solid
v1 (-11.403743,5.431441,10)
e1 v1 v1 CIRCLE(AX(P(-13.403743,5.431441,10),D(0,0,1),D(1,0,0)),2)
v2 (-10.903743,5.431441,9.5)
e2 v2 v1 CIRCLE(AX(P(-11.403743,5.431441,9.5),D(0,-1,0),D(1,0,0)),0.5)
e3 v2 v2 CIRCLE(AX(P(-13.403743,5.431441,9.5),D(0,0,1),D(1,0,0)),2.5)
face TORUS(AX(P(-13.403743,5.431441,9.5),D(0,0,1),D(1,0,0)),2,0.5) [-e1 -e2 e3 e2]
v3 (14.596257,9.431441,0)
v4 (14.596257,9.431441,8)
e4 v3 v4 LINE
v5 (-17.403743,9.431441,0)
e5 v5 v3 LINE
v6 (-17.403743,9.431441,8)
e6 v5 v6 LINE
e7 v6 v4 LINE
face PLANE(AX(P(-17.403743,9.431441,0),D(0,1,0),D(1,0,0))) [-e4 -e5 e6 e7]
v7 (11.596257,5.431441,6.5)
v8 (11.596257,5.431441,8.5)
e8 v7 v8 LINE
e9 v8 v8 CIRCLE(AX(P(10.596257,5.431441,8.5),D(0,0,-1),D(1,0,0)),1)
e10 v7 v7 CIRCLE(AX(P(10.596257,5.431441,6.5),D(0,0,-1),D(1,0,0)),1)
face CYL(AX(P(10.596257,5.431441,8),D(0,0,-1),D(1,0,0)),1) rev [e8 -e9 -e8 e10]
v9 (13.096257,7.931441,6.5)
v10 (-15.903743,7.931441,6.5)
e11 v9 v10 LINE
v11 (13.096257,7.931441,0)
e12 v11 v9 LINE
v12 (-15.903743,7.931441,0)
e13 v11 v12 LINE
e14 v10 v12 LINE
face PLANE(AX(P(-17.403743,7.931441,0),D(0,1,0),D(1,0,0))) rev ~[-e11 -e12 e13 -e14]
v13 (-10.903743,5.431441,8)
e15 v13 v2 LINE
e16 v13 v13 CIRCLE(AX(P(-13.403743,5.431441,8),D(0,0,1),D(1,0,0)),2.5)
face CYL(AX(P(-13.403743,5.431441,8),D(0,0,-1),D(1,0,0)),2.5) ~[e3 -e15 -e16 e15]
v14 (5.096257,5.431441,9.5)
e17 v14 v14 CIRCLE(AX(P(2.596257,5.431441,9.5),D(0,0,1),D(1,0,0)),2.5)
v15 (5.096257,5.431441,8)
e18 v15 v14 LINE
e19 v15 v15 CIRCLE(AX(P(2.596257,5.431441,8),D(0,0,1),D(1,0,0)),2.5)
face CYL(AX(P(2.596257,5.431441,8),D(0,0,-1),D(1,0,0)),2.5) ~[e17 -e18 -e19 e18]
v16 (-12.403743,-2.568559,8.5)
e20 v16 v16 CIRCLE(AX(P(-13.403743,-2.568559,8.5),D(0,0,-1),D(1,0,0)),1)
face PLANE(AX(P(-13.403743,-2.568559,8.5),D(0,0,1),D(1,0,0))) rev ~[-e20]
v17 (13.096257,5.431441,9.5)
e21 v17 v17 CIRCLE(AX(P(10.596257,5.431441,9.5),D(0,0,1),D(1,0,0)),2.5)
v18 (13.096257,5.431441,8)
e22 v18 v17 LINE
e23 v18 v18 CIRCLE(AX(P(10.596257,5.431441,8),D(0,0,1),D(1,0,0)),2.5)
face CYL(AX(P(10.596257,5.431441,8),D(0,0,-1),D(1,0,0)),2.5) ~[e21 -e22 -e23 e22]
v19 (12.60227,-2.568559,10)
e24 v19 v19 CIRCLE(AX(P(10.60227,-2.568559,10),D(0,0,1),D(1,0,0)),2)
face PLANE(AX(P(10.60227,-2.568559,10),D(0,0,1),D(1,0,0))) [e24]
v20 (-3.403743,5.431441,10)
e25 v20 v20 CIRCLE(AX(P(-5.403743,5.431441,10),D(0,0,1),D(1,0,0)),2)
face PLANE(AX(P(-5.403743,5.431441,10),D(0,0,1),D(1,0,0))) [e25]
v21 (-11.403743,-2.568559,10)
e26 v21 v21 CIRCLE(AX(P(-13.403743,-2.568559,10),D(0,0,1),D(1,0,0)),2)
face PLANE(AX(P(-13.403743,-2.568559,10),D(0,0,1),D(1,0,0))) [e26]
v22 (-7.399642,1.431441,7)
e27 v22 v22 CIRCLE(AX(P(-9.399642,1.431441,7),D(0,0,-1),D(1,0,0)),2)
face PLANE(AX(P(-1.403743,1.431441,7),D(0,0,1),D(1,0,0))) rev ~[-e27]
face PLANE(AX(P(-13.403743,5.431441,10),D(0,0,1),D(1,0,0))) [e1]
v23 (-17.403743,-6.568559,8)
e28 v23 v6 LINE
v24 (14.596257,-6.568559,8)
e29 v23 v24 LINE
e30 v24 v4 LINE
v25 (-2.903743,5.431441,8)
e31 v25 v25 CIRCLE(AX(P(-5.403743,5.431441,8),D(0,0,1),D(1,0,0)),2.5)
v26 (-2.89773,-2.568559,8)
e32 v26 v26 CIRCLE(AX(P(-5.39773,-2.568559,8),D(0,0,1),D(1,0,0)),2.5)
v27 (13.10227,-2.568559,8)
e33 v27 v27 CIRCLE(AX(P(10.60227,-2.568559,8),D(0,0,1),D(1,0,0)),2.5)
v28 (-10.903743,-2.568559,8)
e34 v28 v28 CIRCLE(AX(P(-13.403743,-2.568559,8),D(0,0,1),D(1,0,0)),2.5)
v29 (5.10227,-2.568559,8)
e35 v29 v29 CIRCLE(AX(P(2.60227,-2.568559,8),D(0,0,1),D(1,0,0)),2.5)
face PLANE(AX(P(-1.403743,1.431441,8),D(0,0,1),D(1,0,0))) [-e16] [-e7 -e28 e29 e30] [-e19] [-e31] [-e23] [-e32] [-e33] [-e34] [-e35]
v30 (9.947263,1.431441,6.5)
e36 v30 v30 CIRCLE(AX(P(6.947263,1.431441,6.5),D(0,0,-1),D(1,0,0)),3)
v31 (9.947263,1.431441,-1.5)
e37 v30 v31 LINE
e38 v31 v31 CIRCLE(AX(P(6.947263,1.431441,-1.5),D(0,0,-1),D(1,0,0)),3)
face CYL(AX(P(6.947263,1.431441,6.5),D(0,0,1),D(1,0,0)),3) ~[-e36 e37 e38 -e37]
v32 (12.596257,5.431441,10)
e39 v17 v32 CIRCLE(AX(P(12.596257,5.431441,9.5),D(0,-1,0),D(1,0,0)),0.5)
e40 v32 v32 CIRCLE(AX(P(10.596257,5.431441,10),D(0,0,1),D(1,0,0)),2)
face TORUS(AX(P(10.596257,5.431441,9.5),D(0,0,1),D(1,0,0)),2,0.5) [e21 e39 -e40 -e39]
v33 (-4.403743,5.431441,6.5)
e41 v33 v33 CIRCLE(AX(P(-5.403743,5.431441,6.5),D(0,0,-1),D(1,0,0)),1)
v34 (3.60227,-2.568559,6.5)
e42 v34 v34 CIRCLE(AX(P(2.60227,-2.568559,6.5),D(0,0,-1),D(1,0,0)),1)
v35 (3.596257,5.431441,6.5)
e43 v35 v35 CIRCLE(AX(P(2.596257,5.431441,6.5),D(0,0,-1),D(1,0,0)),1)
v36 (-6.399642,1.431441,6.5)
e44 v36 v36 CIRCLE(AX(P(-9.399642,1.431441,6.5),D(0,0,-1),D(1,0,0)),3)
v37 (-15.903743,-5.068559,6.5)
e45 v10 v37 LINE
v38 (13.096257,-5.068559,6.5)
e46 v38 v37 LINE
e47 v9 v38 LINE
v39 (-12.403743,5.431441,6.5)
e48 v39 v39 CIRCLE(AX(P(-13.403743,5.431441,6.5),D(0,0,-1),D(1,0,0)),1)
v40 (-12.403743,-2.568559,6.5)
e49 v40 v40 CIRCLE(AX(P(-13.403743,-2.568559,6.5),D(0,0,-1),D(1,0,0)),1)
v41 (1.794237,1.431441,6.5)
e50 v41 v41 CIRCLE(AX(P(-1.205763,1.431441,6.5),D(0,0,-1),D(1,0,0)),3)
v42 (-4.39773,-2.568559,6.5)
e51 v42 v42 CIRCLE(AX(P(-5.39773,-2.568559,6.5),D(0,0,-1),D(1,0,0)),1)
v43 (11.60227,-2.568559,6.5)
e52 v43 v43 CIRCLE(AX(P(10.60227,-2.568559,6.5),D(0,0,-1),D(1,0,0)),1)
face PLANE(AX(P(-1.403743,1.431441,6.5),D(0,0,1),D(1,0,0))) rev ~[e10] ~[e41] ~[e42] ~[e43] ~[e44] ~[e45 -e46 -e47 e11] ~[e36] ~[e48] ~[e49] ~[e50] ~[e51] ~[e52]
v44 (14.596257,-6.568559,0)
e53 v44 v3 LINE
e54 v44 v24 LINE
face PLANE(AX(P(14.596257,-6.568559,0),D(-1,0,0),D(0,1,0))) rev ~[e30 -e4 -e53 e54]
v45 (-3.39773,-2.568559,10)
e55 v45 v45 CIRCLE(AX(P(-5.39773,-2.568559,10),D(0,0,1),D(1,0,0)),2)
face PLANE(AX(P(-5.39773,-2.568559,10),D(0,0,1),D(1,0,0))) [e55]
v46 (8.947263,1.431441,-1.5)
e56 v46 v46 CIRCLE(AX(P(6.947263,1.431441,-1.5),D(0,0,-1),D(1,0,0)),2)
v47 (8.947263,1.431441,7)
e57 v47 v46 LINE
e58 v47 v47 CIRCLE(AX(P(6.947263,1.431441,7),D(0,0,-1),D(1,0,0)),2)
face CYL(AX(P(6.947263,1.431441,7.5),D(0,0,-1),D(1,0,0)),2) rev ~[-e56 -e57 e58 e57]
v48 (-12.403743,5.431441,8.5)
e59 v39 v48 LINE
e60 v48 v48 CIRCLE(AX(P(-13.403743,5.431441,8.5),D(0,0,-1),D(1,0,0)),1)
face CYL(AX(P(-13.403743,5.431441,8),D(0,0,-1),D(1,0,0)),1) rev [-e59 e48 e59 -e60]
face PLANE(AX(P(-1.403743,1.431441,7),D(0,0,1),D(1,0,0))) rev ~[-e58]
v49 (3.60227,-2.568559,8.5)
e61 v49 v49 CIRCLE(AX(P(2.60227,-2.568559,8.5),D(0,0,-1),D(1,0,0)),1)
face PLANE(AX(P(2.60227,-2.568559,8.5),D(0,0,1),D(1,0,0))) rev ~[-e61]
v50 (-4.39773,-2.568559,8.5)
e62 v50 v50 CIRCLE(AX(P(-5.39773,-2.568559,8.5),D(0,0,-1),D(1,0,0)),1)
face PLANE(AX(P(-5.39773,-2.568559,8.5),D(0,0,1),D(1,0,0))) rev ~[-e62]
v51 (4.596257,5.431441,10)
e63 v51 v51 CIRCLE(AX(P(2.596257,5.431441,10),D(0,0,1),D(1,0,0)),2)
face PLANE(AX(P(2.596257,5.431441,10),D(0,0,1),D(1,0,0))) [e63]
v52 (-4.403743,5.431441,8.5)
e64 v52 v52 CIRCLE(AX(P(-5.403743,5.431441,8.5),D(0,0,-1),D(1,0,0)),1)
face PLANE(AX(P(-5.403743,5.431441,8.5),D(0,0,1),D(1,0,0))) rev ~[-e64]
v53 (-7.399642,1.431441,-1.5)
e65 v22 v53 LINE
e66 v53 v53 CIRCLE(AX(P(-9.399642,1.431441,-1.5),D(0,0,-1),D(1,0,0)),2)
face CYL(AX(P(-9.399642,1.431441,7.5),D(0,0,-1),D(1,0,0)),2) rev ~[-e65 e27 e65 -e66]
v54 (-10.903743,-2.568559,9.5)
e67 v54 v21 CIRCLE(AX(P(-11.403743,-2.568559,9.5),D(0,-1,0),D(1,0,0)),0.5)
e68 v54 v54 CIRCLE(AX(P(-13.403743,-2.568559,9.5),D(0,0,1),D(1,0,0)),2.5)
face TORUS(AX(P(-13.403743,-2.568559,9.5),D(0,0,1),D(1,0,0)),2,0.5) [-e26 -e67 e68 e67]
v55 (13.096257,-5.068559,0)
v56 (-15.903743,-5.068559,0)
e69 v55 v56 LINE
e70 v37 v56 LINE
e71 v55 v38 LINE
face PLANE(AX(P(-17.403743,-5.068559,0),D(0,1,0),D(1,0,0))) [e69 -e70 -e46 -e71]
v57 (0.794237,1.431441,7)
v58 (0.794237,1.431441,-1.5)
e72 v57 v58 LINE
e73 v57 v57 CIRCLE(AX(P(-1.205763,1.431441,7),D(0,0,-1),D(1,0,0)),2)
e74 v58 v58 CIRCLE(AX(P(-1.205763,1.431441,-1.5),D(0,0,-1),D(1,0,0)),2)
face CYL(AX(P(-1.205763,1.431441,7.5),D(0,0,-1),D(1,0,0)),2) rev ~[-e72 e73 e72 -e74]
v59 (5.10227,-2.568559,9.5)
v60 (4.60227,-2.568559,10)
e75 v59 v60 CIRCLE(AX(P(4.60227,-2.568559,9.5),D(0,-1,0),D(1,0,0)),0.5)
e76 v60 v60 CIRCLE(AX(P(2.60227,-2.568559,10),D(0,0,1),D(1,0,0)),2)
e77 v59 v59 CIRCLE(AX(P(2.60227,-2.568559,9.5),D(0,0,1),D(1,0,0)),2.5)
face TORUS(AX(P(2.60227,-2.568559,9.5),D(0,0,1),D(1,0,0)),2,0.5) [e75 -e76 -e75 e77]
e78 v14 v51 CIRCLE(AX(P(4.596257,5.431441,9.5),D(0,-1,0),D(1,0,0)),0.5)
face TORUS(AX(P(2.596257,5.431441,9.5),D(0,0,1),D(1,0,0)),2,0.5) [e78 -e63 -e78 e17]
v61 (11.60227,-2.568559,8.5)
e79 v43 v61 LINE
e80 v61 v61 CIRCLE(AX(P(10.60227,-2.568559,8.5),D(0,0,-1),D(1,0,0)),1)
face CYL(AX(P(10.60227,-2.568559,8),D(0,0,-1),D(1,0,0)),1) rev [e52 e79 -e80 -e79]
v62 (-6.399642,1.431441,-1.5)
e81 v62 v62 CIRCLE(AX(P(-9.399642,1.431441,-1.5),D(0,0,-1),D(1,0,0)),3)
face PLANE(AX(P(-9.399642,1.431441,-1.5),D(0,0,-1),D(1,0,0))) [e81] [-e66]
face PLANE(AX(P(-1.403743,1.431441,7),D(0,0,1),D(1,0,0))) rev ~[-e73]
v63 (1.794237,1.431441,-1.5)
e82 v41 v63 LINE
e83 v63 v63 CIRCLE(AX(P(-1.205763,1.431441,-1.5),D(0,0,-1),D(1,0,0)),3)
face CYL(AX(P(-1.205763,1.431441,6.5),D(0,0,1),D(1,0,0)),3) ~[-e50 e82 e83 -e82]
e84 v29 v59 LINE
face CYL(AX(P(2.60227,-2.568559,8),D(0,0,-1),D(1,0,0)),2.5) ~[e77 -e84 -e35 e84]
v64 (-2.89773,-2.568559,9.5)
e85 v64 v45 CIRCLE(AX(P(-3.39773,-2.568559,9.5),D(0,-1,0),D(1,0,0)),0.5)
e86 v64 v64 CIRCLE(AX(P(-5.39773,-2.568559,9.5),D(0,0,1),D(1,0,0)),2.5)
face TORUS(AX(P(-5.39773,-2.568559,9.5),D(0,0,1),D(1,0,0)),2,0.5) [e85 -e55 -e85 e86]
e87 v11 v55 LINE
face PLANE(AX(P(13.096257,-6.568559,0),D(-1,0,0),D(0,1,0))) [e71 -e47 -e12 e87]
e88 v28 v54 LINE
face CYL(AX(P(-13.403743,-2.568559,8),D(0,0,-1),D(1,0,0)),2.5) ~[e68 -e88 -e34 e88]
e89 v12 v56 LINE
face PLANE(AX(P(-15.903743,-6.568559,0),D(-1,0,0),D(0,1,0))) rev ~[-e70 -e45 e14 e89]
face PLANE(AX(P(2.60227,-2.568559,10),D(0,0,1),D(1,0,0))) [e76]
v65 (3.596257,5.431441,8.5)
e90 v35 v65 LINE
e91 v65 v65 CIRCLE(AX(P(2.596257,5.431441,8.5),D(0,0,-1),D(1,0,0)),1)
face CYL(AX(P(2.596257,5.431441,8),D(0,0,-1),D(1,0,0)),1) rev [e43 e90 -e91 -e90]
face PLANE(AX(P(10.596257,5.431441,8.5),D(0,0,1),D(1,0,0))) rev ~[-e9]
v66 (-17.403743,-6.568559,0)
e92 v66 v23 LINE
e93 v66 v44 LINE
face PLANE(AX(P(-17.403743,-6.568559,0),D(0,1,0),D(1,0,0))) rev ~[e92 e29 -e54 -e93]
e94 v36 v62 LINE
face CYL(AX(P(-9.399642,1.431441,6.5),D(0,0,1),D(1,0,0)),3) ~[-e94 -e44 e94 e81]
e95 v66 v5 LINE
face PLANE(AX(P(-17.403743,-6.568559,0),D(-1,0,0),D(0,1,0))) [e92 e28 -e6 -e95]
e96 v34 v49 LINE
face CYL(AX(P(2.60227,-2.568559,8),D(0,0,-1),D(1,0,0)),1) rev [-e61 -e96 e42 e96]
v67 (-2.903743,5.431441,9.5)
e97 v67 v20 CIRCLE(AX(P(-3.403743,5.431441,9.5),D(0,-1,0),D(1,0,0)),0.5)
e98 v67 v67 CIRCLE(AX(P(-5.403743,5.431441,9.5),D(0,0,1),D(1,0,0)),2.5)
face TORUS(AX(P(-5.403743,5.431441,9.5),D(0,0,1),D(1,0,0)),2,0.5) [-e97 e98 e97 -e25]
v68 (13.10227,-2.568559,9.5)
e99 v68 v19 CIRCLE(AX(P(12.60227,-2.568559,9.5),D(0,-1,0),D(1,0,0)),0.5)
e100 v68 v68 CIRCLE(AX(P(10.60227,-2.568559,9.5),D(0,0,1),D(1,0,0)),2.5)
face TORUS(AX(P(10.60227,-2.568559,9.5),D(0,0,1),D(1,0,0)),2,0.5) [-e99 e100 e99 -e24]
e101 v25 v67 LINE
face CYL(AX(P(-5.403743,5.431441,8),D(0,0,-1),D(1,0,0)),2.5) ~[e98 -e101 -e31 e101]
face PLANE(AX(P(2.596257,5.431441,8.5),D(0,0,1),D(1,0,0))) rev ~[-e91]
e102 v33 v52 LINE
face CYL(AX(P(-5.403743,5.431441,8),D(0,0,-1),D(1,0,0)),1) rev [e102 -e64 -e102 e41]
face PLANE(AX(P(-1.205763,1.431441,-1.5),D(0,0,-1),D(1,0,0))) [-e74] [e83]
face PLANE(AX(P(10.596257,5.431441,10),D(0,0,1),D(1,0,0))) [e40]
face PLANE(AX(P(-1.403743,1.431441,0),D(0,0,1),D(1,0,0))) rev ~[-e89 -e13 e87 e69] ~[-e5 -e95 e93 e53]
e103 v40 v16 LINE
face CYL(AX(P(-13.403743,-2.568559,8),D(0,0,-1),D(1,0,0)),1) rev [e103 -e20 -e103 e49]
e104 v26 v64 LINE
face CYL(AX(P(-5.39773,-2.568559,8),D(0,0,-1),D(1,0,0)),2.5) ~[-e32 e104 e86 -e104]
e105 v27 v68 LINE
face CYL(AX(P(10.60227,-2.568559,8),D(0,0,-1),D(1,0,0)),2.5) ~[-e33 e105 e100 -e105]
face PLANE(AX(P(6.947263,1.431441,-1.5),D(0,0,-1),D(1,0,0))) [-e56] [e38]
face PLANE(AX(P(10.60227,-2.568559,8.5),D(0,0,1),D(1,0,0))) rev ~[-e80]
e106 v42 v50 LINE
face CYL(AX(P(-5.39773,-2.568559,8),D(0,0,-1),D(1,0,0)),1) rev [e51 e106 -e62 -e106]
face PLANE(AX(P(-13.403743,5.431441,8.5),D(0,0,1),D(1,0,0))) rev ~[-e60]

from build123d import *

# Parameters (mm, degrees)
F0_W        = 32
F0_H        = 16
F1_DEPTH    = 8
F2_R        = 2.5
F3_DEPTH    = 2
F4_R        = 0.5
F5_T        = -1.5
F6_R        = 3
F7_DEPTH    = 8
F8_T        = 1
F8_T3_DEPTH = 8.5
F8_T5_DEPTH = 15
F8_T7_DEPTH = 31


# Not quite as in the source:
# - a shell that OpenCascade refuses in one call is made with other operations: the cavity is built on its own and cut out


with BuildPart() as f1:
    # F0 (on Top) → F1 (new body)
    with BuildSketch(Plane.XY):
        with Locations((-1.4037434012, 1.4314407872)):
            Rectangle(F0_W, F0_H)
    extrude(amount=F1_DEPTH)

    # F2 (on face) → F3 (join)
    with BuildSketch(Plane.XY.offset(8)):
        with Locations((-13.4037434012, 5.4314407872)):
            Circle(F2_R)
        with Locations((-5.4037434012, 5.4314407872)):
            Circle(F2_R)
        with Locations((2.5962565988, 5.4314407872)):
            Circle(F2_R)
        with Locations((10.5962565988, 5.4314407872)):
            Circle(F2_R)
        with Locations((-13.4037434012, -2.5685592128)):
            Circle(F2_R)
        with Locations((-5.397730317, -2.5685592128)):
            Circle(F2_R)
        with Locations((2.602269683, -2.5685592128)):
            Circle(F2_R)
        with Locations((10.602269683, -2.5685592128)):
            Circle(F2_R)
    extrude(amount=F3_DEPTH)

    # F4
    f4_edges = [f1.edges().sort_by_distance(p)[0] for p in [
        (8.10227, -2.568559, 10),
        (8.096257, 5.431441, 10),
        (-15.903743, -2.568559, 10),
        (-7.89773, -2.568559, 10),
        (0.10227, -2.568559, 10),
        (0.096257, 5.431441, 10),
        (-7.903743, 5.431441, 10),
        (-15.903743, 5.431441, 10),
    ]]
    fillet(f4_edges, radius=F4_R)

    # F5
    f5_openings = [f1.faces().sort_by_distance(p)[0] for p in [
        (-1.403743, 1.431441, 0),
    ]]
    offset(amount=F5_T, openings=f5_openings, kind=Kind.INTERSECTION)

    # F6 (on face) → F7 (join)
    with BuildSketch(Plane(origin=(0, 0, 6.5), x_dir=(1, 0, 0), z_dir=(0, 0, -1))):
        with Locations((-9.3996422365, -1.4314407872)):
            Circle(F6_R)
        with Locations((-1.2057628483, -1.4314407872)):
            Circle(F6_R)
        with Locations((6.947263144, -1.4314407872)):
            Circle(F6_R)
    extrude(amount=F7_DEPTH)

    # F8: shell of thickness 1, made by hand


with BuildPart() as f8_core1:
    # F8_t2: copy of F1
    add(f1.part)

    # the walls: a layer under each face that stays
    f8_faces = [f8_core1.faces().sort_by_distance(p)[0] for p in [
        (-15.9037434012, -2.5685592128, 8.75),
        (-1.4037434012, 1.4314407872, 8),
        (-13.4037434012, -2.5685592128, 10),
        (14.5962565988, 1.4314407872, 4),
        (-1.4037434012, -6.5685592128, 4),
        (-1.4037434012, 9.4314407872, 4),
        (-17.4037434012, 1.4314407872, 4),
        (-7.897730317, -2.5685592128, 8.75),
        (0.102269683, -2.5685592128, 8.75),
        (8.102269683, -2.5685592128, 8.75),
        (-15.9037434012, 5.4314407872, 8.75),
        (-7.9037434012, 5.4314407872, 8.75),
        (0.0962565988, 5.4314407872, 8.75),
        (8.0962565988, 5.4314407872, 8.75),
        (-15.1180291155, -5.4257020699, 0),
        (13.0962565988, 1.4314407872, 3.25),
        (-1.4037434012, -5.0685592128, 3.25),
        (-15.9037434012, 1.4314407872, 3.25),
        (-1.4037434012, 7.9314407872, 3.25),
        (-5.397730317, -2.5685592128, 10),
        (2.602269683, -2.5685592128, 10),
        (10.602269683, -2.5685592128, 10),
        (-13.4037434012, 5.4314407872, 10),
        (-5.4037434012, 5.4314407872, 10),
        (2.5962565988, 5.4314407872, 10),
        (10.5962565988, 5.4314407872, 10),
        (-11.0704100678, -2.9018925461, 6.5),
        (-14.4037434012, -2.5685592128, 7.5),
        (-6.397730317, -2.5685592128, 7.5),
        (1.602269683, -2.5685592128, 7.5),
        (9.602269683, -2.5685592128, 7.5),
        (-12.3996422365, 1.4314407872, 2.5),
        (-14.4037434012, 5.4314407872, 7.5),
        (-6.4037434012, 5.4314407872, 7.5),
        (-4.2057628483, 1.4314407872, 2.5),
        (3.947263144, 1.4314407872, 2.5),
        (1.5962565988, 5.4314407872, 7.5),
        (9.5962565988, 5.4314407872, 7.5),
        (-13.4037434012, -2.5685592128, 8.5),
        (-5.397730317, -2.5685592128, 8.5),
        (2.602269683, -2.5685592128, 8.5),
        (10.602269683, -2.5685592128, 8.5),
        (-13.4037434012, 5.4314407872, 8.5),
        (-5.4037434012, 5.4314407872, 8.5),
        (2.5962565988, 5.4314407872, 8.5),
        (10.5962565988, 5.4314407872, 8.5),
    ]]
    thicken(f8_faces, amount=-F8_T, mode=Mode.SUBTRACT)

    # F8_s4 → F8_t3 (cut)
    with BuildSketch(Plane.XY.offset(-1)):
        Polygon((13.0862565988, -5.0585592128), (14.0962565988, -5.0685592128), (14.0962565988, -6.0685592128), (13.0962565988, -6.0685592128), align=None)
        Polygon((13.0862565988, 7.9214407872), (14.0962565988, 7.9314407872), (14.0962565988, 8.9314407872), (13.0962565988, 8.9314407872), align=None)
        Polygon((-15.8937434012, -5.0585592128), (-15.9037434012, -6.0685592128), (-16.9037434012, -6.0685592128), (-16.9037434012, -5.0685592128), align=None)
        Polygon((-15.8937434012, 7.9214407872), (-16.9037434012, 7.9314407872), (-16.9037434012, 8.9314407872), (-15.9037434012, 8.9314407872), align=None)
    extrude(amount=F8_T3_DEPTH, mode=Mode.SUBTRACT)

    # F8_s6 → F8_t5 (cut)
    with BuildSketch(Plane.XZ.offset(-8.9314407872)):
        Polygon((13.0862565988, 6.49), (14.0962565988, 6.5), (14.0962565988, 7.5), (13.0962565988, 7.5), align=None)
        Polygon((-15.8937434012, 6.49), (-16.9037434012, 6.5), (-16.9037434012, 7.5), (-15.9037434012, 7.5), align=None)
    extrude(amount=F8_T5_DEPTH, mode=Mode.SUBTRACT)

    # F8_s8 → F8_t7 (cut)
    with BuildSketch(Plane.YZ.offset(-16.9037434012)):
        Polygon((-5.0585592128, 6.49), (-6.0685592128, 6.5), (-6.0685592128, 7.5), (-5.0685592128, 7.5), align=None)
        Polygon((7.9214407872, 6.49), (8.9314407872, 6.5), (8.9314407872, 7.5), (7.9314407872, 7.5), align=None)
    extrude(amount=F8_T7_DEPTH, mode=Mode.SUBTRACT)

    # F8_s9 → F8_t10 (revolve, cut)
    with BuildSketch(Plane.XZ.offset(2.5685592128)):
        Polygon((-10.8937434012, 8.01), (-11.9037434012, 8), (-11.9037434012, 7), (-10.9037434012, 7), align=None)
    revolve(axis=Axis((-13.4037434012, -2.5685592128, 8), (0, 0, 1)), mode=Mode.SUBTRACT)

    # F8_s11 → F8_t12 (revolve, cut)
    with BuildSketch(Plane.XZ.offset(2.5685592128)):
        Polygon((-2.887730317, 8.01), (-2.897730317, 7), (-3.897730317, 7), (-3.897730317, 8), align=None)
    revolve(axis=Axis((-5.397730317, -2.5685592128, 8), (0, 0, 1)), mode=Mode.SUBTRACT)

    # F8_s13 → F8_t14 (revolve, cut)
    with BuildSketch(Plane.XZ.offset(2.5685592128)):
        Polygon((5.112269683, 8.01), (5.102269683, 7), (4.102269683, 7), (4.102269683, 8), align=None)
    revolve(axis=Axis((2.602269683, -2.5685592128, 8), (0, 0, 1)), mode=Mode.SUBTRACT)

    # F8_s15 → F8_t16 (revolve, cut)
    with BuildSketch(Plane.XZ.offset(2.5685592128)):
        Polygon((13.112269683, 8.01), (13.102269683, 7), (12.102269683, 7), (12.102269683, 8), align=None)
    revolve(axis=Axis((10.602269683, -2.5685592128, 8), (0, 0, 1)), mode=Mode.SUBTRACT)

    # F8_s17 → F8_t18 (revolve, cut)
    with BuildSketch(Plane.XZ.offset(-5.4314407872)):
        Polygon((-10.8937434012, 8.01), (-10.9037434012, 7), (-11.9037434012, 7), (-11.9037434012, 8), align=None)
    revolve(axis=Axis((-13.4037434012, 5.4314407872, 8), (0, 0, 1)), mode=Mode.SUBTRACT)

    # F8_s19 → F8_t20 (revolve, cut)
    with BuildSketch(Plane.XZ.offset(-5.4314407872)):
        Polygon((-2.8937434012, 8.01), (-2.9037434012, 7), (-3.9037434012, 7), (-3.9037434012, 8), align=None)
    revolve(axis=Axis((-5.4037434012, 5.4314407872, 8), (0, 0, 1)), mode=Mode.SUBTRACT)

    # F8_s21 → F8_t22 (revolve, cut)
    with BuildSketch(Plane.XZ.offset(-5.4314407872)):
        Polygon((5.1062565988, 8.01), (5.0962565988, 7), (4.0962565988, 7), (4.0962565988, 8), align=None)
    revolve(axis=Axis((2.5962565988, 5.4314407872, 8), (0, 0, 1)), mode=Mode.SUBTRACT)

    # F8_s23 → F8_t24 (revolve, cut)
    with BuildSketch(Plane.XZ.offset(-5.4314407872)):
        Polygon((13.1062565988, 8.01), (13.0962565988, 7), (12.0962565988, 7), (12.0962565988, 8), align=None)
    revolve(axis=Axis((10.5962565988, 5.4314407872, 8), (0, 0, 1)), mode=Mode.SUBTRACT)

    # F8_s25 → F8_t26 (revolve, cut)
    with BuildSketch(Plane.XZ.offset(-1.4314407872)):
        Polygon((-6.3896422365, 6.49), (-6.3996422365, 7.5), (-7.3996422365, 7.5), (-7.3996422365, 6.5), align=None)
    revolve(axis=Axis((-9.3996422365, 1.4314407872, 6.5), (0, 0, -1)), mode=Mode.SUBTRACT)

    # F8_s27 → F8_t28 (revolve, cut)
    with BuildSketch(Plane.XZ.offset(-1.4314407872)):
        Polygon((1.8042371517, 6.49), (1.7942371517, 7.5), (0.7942371517, 7.5), (0.7942371517, 6.5), align=None)
    revolve(axis=Axis((-1.2057628483, 1.4314407872, 6.5), (0, 0, -1)), mode=Mode.SUBTRACT)

    # F8_s29 → F8_t30 (revolve, cut)
    with BuildSketch(Plane.XZ.offset(-1.4314407872)):
        Polygon((9.957263144, 6.49), (9.947263144, 7.5), (8.947263144, 7.5), (8.947263144, 6.5), align=None)
    revolve(axis=Axis((6.947263144, 1.4314407872, 6.5), (0, 0, -1)), mode=Mode.SUBTRACT)

    # F8_s31 → F8_t32 (revolve, cut)
    with BuildSketch(Plane.XZ.offset(2.5685592128)):
        Polygon((-12.4137434012, 8.49), (-11.4037434012, 8.5), (-11.4037434012, 9.5), (-12.4037434012, 9.5), align=None)
    revolve(axis=Axis((-13.4037434012, -2.5685592128, 8.5), (0, 0, -1)), mode=Mode.SUBTRACT)

    # F8_s33 → F8_t34 (revolve, cut)
    with BuildSketch(Plane.XZ.offset(2.5685592128)):
        Polygon((-4.407730317, 8.49), (-3.397730317, 8.5), (-3.397730317, 9.5), (-4.397730317, 9.5), align=None)
    revolve(axis=Axis((-5.397730317, -2.5685592128, 8.5), (0, 0, -1)), mode=Mode.SUBTRACT)

    # F8_s35 → F8_t36 (revolve, cut)
    with BuildSketch(Plane.XZ.offset(2.5685592128)):
        Polygon((3.592269683, 8.49), (4.602269683, 8.5), (4.602269683, 9.5), (3.602269683, 9.5), align=None)
    revolve(axis=Axis((2.602269683, -2.5685592128, 8.5), (0, 0, -1)), mode=Mode.SUBTRACT)

    # F8_s37 → F8_t38 (revolve, cut)
    with BuildSketch(Plane.XZ.offset(2.5685592128)):
        Polygon((11.592269683, 8.49), (12.602269683, 8.5), (12.602269683, 9.5), (11.602269683, 9.5), align=None)
    revolve(axis=Axis((10.602269683, -2.5685592128, 8.5), (0, 0, -1)), mode=Mode.SUBTRACT)

    # F8_s39 → F8_t40 (revolve, cut)
    with BuildSketch(Plane.XZ.offset(-5.4314407872)):
        Polygon((-12.4137434012, 8.49), (-11.4037434012, 8.5), (-11.4037434012, 9.5), (-12.4037434012, 9.5), align=None)
    revolve(axis=Axis((-13.4037434012, 5.4314407872, 8.5), (0, 0, -1)), mode=Mode.SUBTRACT)

    # F8_s41 → F8_t42 (revolve, cut)
    with BuildSketch(Plane.XZ.offset(-5.4314407872)):
        Polygon((-4.4137434012, 8.49), (-3.4037434012, 8.5), (-3.4037434012, 9.5), (-4.4037434012, 9.5), align=None)
    revolve(axis=Axis((-5.4037434012, 5.4314407872, 8.5), (0, 0, -1)), mode=Mode.SUBTRACT)

    # F8_s43 → F8_t44 (revolve, cut)
    with BuildSketch(Plane.XZ.offset(-5.4314407872)):
        Polygon((3.5862565988, 8.49), (4.5962565988, 8.5), (4.5962565988, 9.5), (3.5962565988, 9.5), align=None)
    revolve(axis=Axis((2.5962565988, 5.4314407872, 8.5), (0, 0, -1)), mode=Mode.SUBTRACT)

    # F8_s45 → F8_t46 (revolve, cut)
    with BuildSketch(Plane.XZ.offset(-5.4314407872)):
        Polygon((11.5862565988, 8.49), (12.5962565988, 8.5), (12.5962565988, 9.5), (11.5962565988, 9.5), align=None)
    revolve(axis=Axis((10.5962565988, 5.4314407872, 8.5), (0, 0, -1)), mode=Mode.SUBTRACT)


with BuildPart() as f1_1:
    add(f1.part)

    # what is left inside the walls is the cavity
    f8_cavity = [f8_core1.part.solids().sort_by_distance(p)[0] for p in [
        (4.957263, 1.431441, 4.166667),
        (-11.389642, 1.431441, 4.166667),
        (-3.195763, 1.431441, 4.166667),
    ]]
    add(f8_cavity, mode=Mode.SUBTRACT)


solid = f1_1.part
